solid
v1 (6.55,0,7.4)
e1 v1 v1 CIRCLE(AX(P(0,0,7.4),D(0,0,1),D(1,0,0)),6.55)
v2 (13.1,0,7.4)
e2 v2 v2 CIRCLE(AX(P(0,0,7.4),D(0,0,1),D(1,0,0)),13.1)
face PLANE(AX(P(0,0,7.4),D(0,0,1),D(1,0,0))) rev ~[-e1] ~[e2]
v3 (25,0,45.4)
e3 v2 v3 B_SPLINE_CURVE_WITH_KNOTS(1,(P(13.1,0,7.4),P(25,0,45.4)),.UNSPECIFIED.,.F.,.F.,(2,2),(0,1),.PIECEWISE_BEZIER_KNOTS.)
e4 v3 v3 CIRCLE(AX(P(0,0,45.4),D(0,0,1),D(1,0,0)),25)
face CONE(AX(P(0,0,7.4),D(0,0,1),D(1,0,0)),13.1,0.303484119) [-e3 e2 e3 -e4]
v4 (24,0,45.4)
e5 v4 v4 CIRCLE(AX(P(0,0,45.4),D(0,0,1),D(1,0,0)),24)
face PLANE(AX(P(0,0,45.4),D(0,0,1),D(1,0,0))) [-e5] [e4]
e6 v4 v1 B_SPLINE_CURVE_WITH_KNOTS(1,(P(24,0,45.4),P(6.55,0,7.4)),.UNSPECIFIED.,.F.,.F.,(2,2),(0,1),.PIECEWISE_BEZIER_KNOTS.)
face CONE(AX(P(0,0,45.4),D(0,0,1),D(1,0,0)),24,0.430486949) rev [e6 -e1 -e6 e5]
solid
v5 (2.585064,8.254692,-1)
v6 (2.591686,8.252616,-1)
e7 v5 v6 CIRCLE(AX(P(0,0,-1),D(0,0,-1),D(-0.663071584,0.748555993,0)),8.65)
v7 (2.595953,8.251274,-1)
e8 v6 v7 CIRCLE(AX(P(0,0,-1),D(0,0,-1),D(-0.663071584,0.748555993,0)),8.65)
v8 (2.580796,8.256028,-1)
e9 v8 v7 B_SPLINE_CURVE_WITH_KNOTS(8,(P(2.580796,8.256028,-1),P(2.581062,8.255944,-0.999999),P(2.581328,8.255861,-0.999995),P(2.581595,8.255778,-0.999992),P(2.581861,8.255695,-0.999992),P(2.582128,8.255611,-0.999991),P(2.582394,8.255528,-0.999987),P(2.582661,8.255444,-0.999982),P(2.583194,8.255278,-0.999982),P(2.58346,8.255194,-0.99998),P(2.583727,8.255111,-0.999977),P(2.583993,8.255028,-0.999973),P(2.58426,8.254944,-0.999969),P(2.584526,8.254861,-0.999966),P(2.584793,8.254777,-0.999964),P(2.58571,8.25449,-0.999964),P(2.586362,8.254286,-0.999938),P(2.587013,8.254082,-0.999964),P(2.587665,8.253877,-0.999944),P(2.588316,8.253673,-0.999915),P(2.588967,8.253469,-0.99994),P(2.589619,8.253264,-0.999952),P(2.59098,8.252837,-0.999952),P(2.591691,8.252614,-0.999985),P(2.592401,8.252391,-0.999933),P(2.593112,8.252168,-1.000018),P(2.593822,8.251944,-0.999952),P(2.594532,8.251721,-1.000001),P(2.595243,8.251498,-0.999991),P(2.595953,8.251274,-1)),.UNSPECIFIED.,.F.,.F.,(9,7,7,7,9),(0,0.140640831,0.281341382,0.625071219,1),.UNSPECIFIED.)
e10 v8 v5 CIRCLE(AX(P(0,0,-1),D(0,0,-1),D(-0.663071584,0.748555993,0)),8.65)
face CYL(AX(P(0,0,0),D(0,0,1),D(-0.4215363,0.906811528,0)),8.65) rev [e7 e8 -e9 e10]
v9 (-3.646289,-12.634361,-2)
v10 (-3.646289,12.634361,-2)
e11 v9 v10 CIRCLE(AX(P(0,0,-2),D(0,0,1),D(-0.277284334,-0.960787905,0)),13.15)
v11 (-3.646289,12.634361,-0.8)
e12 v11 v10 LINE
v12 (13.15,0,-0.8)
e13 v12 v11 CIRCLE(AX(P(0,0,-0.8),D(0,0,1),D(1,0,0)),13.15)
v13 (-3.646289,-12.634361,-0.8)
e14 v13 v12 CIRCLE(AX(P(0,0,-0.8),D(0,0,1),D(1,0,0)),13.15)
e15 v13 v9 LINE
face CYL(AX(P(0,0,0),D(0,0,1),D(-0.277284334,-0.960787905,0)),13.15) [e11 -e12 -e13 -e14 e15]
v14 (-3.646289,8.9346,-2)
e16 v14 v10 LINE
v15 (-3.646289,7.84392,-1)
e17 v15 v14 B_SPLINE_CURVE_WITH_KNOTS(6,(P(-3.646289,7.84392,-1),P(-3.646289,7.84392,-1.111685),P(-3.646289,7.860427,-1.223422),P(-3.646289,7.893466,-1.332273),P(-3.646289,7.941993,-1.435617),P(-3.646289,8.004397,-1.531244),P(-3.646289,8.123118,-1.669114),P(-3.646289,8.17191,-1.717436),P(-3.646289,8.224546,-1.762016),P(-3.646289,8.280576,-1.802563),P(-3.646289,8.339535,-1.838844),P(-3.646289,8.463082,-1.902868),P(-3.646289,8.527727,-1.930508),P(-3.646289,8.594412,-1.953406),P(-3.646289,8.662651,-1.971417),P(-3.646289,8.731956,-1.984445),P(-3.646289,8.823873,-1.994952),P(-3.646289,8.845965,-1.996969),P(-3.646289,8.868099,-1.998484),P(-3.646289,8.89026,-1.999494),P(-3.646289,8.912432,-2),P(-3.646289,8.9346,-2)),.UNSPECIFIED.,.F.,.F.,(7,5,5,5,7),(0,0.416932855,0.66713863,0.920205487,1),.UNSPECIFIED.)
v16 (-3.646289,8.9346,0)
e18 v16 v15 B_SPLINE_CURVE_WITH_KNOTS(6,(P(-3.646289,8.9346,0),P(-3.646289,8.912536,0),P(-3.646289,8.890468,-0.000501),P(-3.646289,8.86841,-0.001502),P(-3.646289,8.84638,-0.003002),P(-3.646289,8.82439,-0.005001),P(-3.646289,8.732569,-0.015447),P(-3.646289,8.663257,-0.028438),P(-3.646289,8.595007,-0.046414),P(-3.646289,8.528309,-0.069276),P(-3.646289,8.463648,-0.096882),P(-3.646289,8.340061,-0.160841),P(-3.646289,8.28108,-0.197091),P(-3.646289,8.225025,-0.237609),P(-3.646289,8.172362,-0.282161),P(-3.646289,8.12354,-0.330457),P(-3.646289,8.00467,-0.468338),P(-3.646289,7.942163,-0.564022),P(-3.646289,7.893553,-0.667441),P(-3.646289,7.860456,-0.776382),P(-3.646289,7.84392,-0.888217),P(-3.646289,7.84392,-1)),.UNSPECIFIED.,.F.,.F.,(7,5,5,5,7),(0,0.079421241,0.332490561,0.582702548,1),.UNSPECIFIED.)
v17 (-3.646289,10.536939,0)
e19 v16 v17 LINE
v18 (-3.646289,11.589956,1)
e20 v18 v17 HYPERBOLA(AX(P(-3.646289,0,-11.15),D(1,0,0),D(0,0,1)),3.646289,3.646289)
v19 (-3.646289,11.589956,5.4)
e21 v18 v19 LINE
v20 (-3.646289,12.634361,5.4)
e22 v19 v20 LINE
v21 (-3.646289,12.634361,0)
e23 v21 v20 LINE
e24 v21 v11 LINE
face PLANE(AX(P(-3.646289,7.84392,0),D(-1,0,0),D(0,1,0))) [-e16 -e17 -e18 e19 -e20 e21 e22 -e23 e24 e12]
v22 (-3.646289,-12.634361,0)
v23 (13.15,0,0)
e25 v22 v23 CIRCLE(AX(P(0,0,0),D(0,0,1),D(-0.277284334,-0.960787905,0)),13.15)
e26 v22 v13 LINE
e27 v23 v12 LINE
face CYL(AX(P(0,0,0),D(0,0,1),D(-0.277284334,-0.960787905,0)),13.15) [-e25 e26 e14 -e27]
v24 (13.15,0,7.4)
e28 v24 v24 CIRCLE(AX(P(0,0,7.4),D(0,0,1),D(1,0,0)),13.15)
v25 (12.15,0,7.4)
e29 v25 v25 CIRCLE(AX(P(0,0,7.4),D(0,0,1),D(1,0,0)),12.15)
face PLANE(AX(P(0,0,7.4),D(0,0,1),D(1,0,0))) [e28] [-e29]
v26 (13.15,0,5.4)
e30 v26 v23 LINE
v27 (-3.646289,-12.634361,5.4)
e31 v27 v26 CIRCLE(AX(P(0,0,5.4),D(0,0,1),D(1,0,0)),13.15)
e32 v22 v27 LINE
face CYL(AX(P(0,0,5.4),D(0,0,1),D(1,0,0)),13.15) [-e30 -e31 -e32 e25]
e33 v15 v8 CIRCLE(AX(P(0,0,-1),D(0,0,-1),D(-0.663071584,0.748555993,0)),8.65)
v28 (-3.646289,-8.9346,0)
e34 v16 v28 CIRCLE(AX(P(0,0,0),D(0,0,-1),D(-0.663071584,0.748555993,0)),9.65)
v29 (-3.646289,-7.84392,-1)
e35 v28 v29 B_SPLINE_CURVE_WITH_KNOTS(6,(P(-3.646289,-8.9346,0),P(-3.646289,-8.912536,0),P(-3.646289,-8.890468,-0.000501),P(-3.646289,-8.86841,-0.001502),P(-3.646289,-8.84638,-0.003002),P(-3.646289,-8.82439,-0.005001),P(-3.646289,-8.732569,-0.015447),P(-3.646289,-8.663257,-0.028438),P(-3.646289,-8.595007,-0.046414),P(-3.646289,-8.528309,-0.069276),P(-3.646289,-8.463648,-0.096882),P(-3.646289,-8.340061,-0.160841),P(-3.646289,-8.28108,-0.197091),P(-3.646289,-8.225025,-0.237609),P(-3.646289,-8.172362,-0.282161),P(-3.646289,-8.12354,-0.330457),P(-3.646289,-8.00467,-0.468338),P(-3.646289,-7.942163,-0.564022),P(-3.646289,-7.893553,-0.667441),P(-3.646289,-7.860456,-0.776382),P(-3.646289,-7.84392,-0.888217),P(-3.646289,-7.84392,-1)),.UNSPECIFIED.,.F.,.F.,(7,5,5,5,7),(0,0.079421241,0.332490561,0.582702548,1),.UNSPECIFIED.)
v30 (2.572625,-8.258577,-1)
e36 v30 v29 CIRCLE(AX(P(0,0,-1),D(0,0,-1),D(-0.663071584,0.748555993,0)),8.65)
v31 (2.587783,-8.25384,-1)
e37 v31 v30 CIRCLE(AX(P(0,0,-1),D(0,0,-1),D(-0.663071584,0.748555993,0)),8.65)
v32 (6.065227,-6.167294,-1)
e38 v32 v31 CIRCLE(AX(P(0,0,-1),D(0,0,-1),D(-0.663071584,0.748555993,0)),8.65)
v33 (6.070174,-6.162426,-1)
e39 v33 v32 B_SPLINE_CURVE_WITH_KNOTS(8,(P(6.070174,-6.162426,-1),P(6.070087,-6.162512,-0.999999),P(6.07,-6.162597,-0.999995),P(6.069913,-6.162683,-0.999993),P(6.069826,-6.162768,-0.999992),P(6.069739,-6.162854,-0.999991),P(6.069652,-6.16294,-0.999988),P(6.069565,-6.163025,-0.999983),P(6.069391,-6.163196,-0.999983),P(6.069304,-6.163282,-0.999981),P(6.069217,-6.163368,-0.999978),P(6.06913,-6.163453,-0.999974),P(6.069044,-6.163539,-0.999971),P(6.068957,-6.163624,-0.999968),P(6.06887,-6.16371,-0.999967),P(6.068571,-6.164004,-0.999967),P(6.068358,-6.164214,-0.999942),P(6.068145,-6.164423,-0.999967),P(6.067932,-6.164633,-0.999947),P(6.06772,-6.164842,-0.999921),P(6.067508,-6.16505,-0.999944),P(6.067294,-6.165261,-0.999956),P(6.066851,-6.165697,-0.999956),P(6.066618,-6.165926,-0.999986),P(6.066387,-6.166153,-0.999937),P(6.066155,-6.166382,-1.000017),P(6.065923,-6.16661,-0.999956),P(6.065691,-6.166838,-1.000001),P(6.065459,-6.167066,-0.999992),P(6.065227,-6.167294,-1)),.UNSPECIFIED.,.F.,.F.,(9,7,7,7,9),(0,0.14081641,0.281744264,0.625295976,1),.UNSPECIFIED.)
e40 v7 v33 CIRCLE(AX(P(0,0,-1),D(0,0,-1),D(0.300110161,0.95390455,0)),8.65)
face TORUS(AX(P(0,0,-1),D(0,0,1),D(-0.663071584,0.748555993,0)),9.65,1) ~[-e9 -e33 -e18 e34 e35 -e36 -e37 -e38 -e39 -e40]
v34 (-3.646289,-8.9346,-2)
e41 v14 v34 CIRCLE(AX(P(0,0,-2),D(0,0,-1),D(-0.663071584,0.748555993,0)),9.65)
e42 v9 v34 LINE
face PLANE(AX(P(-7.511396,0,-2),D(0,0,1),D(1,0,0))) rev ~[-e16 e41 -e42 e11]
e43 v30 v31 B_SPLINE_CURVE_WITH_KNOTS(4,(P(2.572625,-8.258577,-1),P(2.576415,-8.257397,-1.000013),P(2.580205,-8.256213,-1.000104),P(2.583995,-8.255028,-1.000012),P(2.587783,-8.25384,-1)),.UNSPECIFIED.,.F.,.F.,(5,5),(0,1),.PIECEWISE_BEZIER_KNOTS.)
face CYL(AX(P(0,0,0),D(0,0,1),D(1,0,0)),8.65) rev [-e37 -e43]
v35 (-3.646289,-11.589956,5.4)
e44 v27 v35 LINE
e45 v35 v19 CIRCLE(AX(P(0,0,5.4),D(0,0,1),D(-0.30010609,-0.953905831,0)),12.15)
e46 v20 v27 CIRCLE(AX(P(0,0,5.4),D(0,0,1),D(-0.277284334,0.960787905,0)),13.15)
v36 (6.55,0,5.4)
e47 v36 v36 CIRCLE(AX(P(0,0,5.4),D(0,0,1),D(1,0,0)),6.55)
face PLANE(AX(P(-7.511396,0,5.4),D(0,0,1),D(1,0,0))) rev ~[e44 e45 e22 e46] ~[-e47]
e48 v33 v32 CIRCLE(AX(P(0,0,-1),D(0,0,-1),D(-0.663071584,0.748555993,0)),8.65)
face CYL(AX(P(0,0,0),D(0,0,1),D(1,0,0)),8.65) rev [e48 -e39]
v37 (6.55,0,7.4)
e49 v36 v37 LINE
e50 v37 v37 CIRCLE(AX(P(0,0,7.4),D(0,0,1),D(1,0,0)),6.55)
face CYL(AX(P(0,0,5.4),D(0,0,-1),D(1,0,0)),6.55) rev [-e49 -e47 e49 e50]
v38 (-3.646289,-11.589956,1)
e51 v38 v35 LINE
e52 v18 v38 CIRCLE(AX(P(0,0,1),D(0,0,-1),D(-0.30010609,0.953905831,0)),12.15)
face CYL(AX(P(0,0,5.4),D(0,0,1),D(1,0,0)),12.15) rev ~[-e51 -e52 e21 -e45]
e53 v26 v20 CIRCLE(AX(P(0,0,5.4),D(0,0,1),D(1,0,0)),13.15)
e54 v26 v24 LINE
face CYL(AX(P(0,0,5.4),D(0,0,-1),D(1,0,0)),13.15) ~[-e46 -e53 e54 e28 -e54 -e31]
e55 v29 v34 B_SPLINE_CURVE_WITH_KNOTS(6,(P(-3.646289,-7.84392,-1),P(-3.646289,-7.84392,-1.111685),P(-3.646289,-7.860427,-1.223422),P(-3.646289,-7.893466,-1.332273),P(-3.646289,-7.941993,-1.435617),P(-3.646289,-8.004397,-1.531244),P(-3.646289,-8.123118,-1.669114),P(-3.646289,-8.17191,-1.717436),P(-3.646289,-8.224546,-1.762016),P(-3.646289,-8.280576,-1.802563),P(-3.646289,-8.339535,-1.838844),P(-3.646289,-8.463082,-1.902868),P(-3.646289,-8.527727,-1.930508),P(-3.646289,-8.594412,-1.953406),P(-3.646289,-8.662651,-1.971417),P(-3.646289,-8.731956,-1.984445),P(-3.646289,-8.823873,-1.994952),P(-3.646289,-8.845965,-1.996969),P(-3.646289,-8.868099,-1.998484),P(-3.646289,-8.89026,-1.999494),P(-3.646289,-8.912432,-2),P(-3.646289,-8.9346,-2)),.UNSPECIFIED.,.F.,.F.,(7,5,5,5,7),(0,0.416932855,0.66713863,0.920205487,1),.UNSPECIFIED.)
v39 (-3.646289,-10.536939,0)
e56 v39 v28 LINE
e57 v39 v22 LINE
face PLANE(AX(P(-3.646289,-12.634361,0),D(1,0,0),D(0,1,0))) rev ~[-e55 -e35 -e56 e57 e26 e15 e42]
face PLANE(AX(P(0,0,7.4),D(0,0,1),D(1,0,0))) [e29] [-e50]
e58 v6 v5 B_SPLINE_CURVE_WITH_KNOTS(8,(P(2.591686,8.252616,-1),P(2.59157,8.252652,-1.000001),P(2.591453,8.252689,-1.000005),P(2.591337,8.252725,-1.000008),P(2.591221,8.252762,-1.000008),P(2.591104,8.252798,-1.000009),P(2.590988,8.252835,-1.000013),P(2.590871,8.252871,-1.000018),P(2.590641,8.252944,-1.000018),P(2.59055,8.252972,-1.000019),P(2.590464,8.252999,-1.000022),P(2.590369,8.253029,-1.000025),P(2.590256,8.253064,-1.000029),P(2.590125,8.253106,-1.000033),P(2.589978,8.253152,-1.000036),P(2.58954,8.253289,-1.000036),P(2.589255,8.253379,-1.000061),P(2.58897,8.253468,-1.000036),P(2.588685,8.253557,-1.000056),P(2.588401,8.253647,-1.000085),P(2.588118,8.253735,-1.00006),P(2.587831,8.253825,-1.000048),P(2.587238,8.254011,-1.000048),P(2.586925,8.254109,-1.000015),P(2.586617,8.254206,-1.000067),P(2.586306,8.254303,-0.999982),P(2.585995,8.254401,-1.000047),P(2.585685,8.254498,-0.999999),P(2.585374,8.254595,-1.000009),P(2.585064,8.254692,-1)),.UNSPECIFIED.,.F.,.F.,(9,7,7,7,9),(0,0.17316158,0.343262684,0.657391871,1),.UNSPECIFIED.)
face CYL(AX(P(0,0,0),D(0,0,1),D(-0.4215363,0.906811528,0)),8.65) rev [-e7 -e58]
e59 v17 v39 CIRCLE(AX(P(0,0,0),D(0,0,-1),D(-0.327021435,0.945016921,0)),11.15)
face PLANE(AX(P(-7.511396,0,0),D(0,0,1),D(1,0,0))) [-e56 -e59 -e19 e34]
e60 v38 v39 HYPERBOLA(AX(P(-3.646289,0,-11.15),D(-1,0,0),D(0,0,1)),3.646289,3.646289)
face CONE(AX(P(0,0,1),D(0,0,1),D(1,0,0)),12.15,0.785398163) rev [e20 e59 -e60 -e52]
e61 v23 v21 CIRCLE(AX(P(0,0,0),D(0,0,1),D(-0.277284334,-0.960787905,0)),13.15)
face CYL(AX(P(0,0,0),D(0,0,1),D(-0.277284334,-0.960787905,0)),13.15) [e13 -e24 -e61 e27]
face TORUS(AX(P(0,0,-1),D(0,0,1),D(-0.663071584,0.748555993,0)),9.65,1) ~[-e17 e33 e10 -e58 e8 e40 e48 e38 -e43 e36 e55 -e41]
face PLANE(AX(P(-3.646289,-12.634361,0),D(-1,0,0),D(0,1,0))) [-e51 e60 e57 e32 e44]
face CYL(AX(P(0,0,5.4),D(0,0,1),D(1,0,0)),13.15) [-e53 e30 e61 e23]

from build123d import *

# Parameters (mm, degrees)
F2_DEPTH      = 2
F3_R          = 12.15
F3_R_2        = 6.55
F4_DEPTH      = 2
F3_R_3        = 13.15
F5_DEPTH      = 6.2
F5_DEPTH_BACK = 2
F6_DEPTH      = 5.4
F6_DEPTH_BACK = 25
F7_SIZE       = 1
F8_T2_ANGLE   = 263.0691041821
F8_T4_ANGLE   = 263.0691041821
F11_R         = 13.1
F10_R         = 25
F13_R         = 24
F14_R         = 6.55


# Not quite as in the source:
# - a fillet or chamfer that OpenCascade refuses, or shapes differently, is made with other operations: its cross-section is extruded or revolved along the edge and cut away or added


with BuildPart() as f2:
    # F0 (on Top) → F2 (new body)
    with BuildSketch(Plane.XY):
        with BuildLine():
            ThreePointArc((-3.6462889984, -7.8439197178), (-8.65, 0), (-3.6462889984, 7.8439197178))
            Line((-3.6462889984, 7.8439197178), (-3.6462889984, 12.634360947))
            ThreePointArc((-3.6462889984, 12.634360947), (-13.15, 0), (-3.6462889984, -12.634360947))
            Line((-3.6462889984, -12.634360947), (-3.6462889984, -7.8439197178))
        make_face()
        with BuildLine():
            ThreePointArc((-3.6462889984, 7.8439197178), (4.6519942048, 7.2925612728), (8.65, 0))
            ThreePointArc((8.65, 0), (4.6519942048, -7.2925612728), (-3.6462889984, -7.8439197178))
            Line((-3.6462889984, -7.8439197178), (-3.6462889984, -12.634360947))
            ThreePointArc((-3.6462889984, -12.634360947), (7.9048655798, -10.5088343866), (13.15, 0))
            ThreePointArc((13.15, 0), (7.9048655798, 10.5088343866), (-3.6462889984, 12.634360947))
            Line((-3.6462889984, 12.634360947), (-3.6462889984, 7.8439197178))
        make_face()
    extrude(amount=-F2_DEPTH)



with BuildPart() as f4:
    # F3 (on offset) → F4 (new body)
    with BuildSketch(Plane.XY.offset(5.4)):
        Circle(F3_R)
        Circle(F3_R_2, mode=Mode.SUBTRACT)
    extrude(amount=F4_DEPTH)


with BuildPart() as f2_1:
    add(f2.part)

    add(f4.part)  # F5 merges F4
    # F3 (on offset) → F5 (join, two sides)
    with BuildSketch(Plane.XY.offset(5.4)) as f5_sk:
        Circle(F3_R_3)
        Circle(F3_R, mode=Mode.SUBTRACT)
    extrude(amount=-F5_DEPTH)
    extrude(f5_sk.sketch, amount=F5_DEPTH_BACK)

    # F0 (on Top) → F6 (cut, two sides)
    with BuildSketch(Plane.XY) as f6_sk:
        with BuildLine():
            ThreePointArc((-3.6462889984, -7.8439197178), (-8.65, 0), (-3.6462889984, 7.8439197178))
            Line((-3.6462889984, 7.8439197178), (-3.6462889984, 12.634360947))
            ThreePointArc((-3.6462889984, 12.634360947), (-13.15, 0), (-3.6462889984, -12.634360947))
            Line((-3.6462889984, -12.634360947), (-3.6462889984, -7.8439197178))
        make_face()
    extrude(amount=F6_DEPTH, mode=Mode.SUBTRACT)
    extrude(f6_sk.sketch, amount=-F6_DEPTH_BACK, mode=Mode.SUBTRACT)

    # F7
    f7_edges = [f2_1.edges().sort_by_distance(p)[0] for p in [
        (12.15, 0, 0),
    ]]
    chamfer(f7_edges, length=F7_SIZE)

    # F8: fillet of radius 1 on 2 edges, made by hand

    # F8_s1 → F8_t2 (revolve, cut)
    with BuildSketch(Plane(origin=(0, 0, 0), x_dir=(0, 0, 1), z_dir=(-0.7485559931, -0.6630715838, 0))):
        with BuildLine():
            ThreePointArc((0, 9.65), (-0.2928932188, 8.9428932188), (-1, 8.65))
            Line((-1, 8.65), (0, 8.65))
            Line((0, 8.65), (0, 9.65))
        make_face()
    revolve(axis=Axis((0, 0, 0), (0, 0, -1)), revolution_arc=F8_T2_ANGLE, mode=Mode.SUBTRACT)

    # F8_s3 → F8_t4 (revolve, cut)
    with BuildSketch(Plane(origin=(0, 0, 0), x_dir=(0, 0, 1), z_dir=(-0.7485559931, -0.6630715838, 0))):
        with BuildLine():
            ThreePointArc((-1, 8.65), (-1.7071067812, 8.9428932188), (-2, 9.65))
            Line((-2, 9.65), (-2, 8.65))
            Line((-2, 8.65), (-1, 8.65))
        make_face()
    revolve(axis=Axis((0, 0, -2), (0, 0, -1)), revolution_arc=F8_T4_ANGLE, mode=Mode.SUBTRACT)


with BuildPart() as f12:
    # F11 (on face) → F12 section 0
    with BuildSketch(Plane.XY.offset(7.4)):
        Circle(F11_R)
    # F10 (on offset) → F12 section 1
    with BuildSketch(Plane.XY.offset(45.4)):
        Circle(F10_R)
    loft()

    # F13 (on face) → F15 section 0
    with BuildSketch(Plane.XY.offset(45.4)):
        Circle(F13_R)
    # F14 (on face) → F15 section 1
    with BuildSketch(Plane.XY.offset(7.4)):
        Circle(F14_R)
    loft(mode=Mode.SUBTRACT)


solid = Compound([f2_1.part, f12.part])
